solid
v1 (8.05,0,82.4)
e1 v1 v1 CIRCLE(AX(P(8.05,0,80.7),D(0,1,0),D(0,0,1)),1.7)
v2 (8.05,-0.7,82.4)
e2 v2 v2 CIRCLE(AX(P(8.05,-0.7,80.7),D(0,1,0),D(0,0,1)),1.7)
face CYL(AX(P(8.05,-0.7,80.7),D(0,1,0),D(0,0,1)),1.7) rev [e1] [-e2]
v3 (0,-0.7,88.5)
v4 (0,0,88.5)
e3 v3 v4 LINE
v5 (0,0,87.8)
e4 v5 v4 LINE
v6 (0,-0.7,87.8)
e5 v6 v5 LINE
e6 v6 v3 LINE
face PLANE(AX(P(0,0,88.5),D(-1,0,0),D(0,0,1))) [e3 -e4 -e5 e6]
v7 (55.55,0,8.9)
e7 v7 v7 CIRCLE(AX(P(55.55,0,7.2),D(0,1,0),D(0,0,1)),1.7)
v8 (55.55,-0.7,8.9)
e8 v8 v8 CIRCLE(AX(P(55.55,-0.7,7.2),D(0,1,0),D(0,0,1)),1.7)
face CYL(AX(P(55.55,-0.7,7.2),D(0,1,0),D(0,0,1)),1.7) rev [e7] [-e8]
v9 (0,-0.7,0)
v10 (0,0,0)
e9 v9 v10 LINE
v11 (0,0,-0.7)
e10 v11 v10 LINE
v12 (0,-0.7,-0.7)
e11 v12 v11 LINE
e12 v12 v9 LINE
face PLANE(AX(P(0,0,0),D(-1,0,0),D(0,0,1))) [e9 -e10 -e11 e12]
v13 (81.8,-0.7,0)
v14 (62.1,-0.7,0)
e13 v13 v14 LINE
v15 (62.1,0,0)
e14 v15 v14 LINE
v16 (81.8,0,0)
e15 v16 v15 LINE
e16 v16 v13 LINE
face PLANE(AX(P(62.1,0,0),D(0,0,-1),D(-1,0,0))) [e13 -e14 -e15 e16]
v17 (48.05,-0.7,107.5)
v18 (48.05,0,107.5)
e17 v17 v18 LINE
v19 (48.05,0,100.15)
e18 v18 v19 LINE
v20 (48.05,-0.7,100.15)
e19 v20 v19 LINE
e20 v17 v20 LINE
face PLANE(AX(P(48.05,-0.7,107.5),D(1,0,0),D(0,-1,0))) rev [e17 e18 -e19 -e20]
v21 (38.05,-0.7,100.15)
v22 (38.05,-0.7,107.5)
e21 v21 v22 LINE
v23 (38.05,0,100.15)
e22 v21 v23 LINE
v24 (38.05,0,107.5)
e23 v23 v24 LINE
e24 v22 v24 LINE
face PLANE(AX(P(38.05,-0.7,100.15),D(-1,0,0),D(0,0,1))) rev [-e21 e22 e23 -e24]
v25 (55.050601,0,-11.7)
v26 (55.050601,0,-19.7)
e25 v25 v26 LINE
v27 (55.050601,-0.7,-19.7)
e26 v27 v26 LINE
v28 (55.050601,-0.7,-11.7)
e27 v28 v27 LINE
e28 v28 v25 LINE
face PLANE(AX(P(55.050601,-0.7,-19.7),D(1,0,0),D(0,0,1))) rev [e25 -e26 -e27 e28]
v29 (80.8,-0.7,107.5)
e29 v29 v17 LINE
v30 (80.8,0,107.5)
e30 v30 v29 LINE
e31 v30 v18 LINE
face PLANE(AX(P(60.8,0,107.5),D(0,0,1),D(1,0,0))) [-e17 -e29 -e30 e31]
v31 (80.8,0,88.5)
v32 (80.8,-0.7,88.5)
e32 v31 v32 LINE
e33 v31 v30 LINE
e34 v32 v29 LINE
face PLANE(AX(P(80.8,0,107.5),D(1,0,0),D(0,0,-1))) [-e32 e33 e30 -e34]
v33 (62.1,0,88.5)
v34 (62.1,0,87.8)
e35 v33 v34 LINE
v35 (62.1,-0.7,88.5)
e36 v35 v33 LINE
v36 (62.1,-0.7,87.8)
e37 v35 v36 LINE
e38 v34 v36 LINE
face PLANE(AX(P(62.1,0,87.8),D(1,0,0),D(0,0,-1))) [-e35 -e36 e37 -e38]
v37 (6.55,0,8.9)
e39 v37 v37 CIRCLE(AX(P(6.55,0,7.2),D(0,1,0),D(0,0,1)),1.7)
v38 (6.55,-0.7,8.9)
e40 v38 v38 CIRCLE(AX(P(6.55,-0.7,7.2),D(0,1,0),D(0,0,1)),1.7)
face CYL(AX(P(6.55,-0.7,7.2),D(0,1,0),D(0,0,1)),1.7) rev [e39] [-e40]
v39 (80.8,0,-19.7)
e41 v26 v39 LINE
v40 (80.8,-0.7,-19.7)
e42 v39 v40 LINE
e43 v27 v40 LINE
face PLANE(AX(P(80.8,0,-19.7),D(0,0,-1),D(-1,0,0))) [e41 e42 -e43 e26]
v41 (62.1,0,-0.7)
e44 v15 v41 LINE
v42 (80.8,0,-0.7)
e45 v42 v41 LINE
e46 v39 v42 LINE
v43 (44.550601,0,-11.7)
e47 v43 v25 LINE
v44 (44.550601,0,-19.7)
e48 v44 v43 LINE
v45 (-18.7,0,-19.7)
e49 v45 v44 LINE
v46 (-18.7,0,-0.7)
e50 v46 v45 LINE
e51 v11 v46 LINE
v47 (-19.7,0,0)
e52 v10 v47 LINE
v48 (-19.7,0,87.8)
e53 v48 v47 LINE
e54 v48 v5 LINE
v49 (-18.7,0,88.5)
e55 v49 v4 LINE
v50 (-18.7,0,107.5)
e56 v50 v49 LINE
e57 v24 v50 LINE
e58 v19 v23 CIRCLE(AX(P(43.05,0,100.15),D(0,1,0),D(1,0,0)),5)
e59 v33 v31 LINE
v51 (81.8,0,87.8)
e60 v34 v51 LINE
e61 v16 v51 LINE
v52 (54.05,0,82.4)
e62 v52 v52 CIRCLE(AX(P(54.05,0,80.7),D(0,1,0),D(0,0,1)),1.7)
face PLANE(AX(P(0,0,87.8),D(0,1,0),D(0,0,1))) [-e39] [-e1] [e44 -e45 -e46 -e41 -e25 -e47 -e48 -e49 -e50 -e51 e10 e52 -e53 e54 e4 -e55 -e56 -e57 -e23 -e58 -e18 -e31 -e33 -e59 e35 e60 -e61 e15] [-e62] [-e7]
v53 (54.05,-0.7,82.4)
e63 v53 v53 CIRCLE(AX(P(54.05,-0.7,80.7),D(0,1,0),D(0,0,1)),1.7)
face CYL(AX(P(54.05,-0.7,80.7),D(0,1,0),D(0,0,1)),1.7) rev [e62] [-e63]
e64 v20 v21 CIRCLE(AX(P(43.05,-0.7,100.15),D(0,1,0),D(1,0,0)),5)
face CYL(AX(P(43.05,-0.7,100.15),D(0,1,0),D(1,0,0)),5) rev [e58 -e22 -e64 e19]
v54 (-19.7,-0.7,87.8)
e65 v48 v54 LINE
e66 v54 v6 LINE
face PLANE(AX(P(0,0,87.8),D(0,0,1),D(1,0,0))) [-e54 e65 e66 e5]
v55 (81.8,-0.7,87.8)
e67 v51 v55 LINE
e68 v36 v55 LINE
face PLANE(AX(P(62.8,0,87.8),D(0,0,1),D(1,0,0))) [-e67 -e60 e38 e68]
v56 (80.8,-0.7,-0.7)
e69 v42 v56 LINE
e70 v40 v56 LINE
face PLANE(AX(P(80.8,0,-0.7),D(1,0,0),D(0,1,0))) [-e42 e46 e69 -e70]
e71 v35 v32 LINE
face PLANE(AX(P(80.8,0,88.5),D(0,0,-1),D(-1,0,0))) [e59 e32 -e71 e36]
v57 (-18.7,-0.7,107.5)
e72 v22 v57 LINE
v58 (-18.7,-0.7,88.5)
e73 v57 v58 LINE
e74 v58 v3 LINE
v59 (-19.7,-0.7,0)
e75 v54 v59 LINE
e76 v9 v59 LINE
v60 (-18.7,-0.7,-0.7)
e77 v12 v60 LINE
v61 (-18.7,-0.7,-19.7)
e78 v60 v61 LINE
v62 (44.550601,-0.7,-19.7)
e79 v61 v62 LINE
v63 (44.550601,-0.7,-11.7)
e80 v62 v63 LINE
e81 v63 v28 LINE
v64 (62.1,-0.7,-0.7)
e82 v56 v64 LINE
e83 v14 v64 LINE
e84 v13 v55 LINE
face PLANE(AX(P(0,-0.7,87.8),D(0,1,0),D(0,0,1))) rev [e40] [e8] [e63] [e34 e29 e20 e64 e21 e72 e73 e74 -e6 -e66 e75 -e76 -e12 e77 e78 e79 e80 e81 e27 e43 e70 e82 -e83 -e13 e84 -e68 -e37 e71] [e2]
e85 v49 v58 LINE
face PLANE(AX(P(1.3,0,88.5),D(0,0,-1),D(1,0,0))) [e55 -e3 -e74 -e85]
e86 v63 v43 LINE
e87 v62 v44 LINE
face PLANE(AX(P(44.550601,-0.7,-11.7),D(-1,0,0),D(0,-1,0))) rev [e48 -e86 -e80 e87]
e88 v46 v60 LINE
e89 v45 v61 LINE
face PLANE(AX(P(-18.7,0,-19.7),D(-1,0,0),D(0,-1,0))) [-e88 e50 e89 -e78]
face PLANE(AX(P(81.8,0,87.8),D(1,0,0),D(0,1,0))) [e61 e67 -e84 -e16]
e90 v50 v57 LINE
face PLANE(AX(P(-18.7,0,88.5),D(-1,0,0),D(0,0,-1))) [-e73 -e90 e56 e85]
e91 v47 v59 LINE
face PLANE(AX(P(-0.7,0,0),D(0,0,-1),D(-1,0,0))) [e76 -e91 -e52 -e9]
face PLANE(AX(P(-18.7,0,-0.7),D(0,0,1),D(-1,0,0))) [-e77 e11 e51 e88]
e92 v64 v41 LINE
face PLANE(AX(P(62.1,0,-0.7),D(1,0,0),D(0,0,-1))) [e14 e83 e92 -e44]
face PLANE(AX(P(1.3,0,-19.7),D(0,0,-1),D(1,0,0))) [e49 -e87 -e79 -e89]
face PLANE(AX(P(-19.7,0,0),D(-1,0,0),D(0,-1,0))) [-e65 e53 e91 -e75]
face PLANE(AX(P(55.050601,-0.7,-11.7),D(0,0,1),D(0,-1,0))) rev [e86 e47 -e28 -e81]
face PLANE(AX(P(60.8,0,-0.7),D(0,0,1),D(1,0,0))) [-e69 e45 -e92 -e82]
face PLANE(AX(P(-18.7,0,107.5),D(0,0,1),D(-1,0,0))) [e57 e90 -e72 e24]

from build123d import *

# Parameters (mm, degrees)
SKETCH1_W                 = 62.1
SKETCH1_H                 = 0.7
BASE_FLANGE1_DEPTH        = 87.8
EDGE_FLANGE1_DEPTH        = 87.8
EDGE_FLANGE2_DEPTH        = 87.8
EDGE_FLANGE3_DEPTH        = 62.1
CUT_EXTRUDE2_DEPTH        = 0.7
SKETCH14_R                = 1.7
CUT_EXTRUDE3_DEPTH        = 0.7
EDGE_FLANGE4_DEPTH        = 19
EDGE_FLANGE5_DEPTH        = 19
EDGE_FLANGE6_DEPTH        = 62.1
EDGE_FLANGE7_DEPTH        = 19
EDGE_FLANGE8_DEPTH        = 19
SKETCH32_W                = 10.5
SKETCH32_H                = 8
CUT_EXTRUDE5_DEPTH        = 0.7
FLAT_PATTERN1_START       = -20.7
FLAT_PATTERN1_OUTLINE_R   = 1.7
FLAT_PATTERN1_DEPTH       = 20
FLAT_PATTERN1_START_2     = -0.7
FLAT_PATTERN1_2_OUTLINE_R = 1.7
FLAT_PATTERN1_2_DEPTH     = 0.7


with BuildPart() as part:
    # Base-Flange1: sheet metal written as solids
    # Sketch1 → Base-Flange1 (new body)
    with BuildSketch(Plane.XY):
        with Locations((31.05, -0.35)):
            Rectangle(SKETCH1_W, SKETCH1_H)
    extrude(amount=BASE_FLANGE1_DEPTH)

    # Edge-Flange1: sheet metal written as solids
    # Edge-Flange1 section (on a plane across the edge) → Edge-Flange1 (add)
    with BuildSketch(Plane(origin=(63.1, -0.7, 0), x_dir=(-1, 0, 0), z_dir=(0, 0, 1))):
        with BuildLine():
            Line((-0.7, 1), (-0.7, 20))
            Line((-0.7, 20), (0, 20))
            Line((0, 20), (0, 1))
            ThreePointArc((0, 1), (0.292893219, 0.292893219), (1, 0))
            Line((1, 0), (1, -0.7))
            ThreePointArc((1, -0.7), (-0.202081528, -0.202081528), (-0.7, 1))
        make_face()
    extrude(amount=EDGE_FLANGE1_DEPTH)

    # Edge-Flange2: sheet metal written as solids
    # Edge-Flange2 section (on a plane across the edge) → Edge-Flange2 (add)
    with BuildSketch(Plane(origin=(-1, -0.7, 87.8), x_dir=(1, 0, 0), z_dir=(0, 0, -1))):
        with BuildLine():
            Line((-0.7, 1), (-0.7, 20))
            Line((-0.7, 20), (0, 20))
            Line((0, 20), (0, 1))
            ThreePointArc((0, 1), (0.292893219, 0.292893219), (1, 0))
            Line((1, 0), (1, -0.7))
            ThreePointArc((1, -0.7), (-0.202081528, -0.202081528), (-0.7, 1))
        make_face()
    extrude(amount=EDGE_FLANGE2_DEPTH)

    # Edge-Flange3: sheet metal written as solids
    # Edge-Flange3 section (on a plane across the edge) → Edge-Flange3 (add)
    with BuildSketch(Plane(origin=(62.1, -0.7, 88.8), x_dir=(0, 0, -1), z_dir=(-1, 0, 0))):
        with BuildLine():
            Line((-0.7, 1), (-0.7, 20))
            Line((-0.7, 20), (0, 20))
            Line((0, 20), (0, 1))
            ThreePointArc((0, 1), (0.292893219, 0.292893219), (1, 0))
            Line((1, 0), (1, -0.7))
            ThreePointArc((1, -0.7), (-0.202081528, -0.202081528), (-0.7, 1))
        make_face()
    extrude(amount=EDGE_FLANGE3_DEPTH)

    # Sketch13 → Cut-Extrude2 (cut)
    with BuildSketch(Plane.XY.offset(89.5)):
        with BuildLine():
            Line((38.05, -13.35), (38.05, -20.7))
            Line((38.05, -20.7), (48.05, -20.7))
            Line((48.05, -20.7), (48.05, -13.35))
            ThreePointArc((48.05, -13.35), (43.05, -8.35), (38.05, -13.35))
        make_face()
    extrude(amount=-CUT_EXTRUDE2_DEPTH, mode=Mode.SUBTRACT)

    # Sketch14 → Cut-Extrude3 (cut)
    with BuildSketch(Plane(origin=(0, 0, 0), x_dir=(1, 0, 0), z_dir=(0, 1, 0))):
        with Locations(Location((6.55, -7.2, 0), (0, 0, 270))):
            Circle(SKETCH14_R)
        with Locations(Location((55.55, -7.2, 0), (0, 0, 270))):
            Circle(SKETCH14_R)
        with Locations(Location((8.05, -80.7, 0), (0, 0, 270))):
            Circle(SKETCH14_R)
        with Locations(Location((54.05, -80.7, 0), (0, 0, 270))):
            Circle(SKETCH14_R)
    extrude(amount=-CUT_EXTRUDE3_DEPTH, mode=Mode.SUBTRACT)

    # Edge-Flange4: sheet metal written as solids
    # Edge-Flange4 section (on a plane across the edge) → Edge-Flange4 (add)
    with BuildSketch(Plane(origin=(64.1, -1.7, 88.8), x_dir=(-1, 0, 0), z_dir=(0, -1, 0))):
        with BuildLine():
            Line((-0.7, 2), (-0.7, 20))
            Line((-0.7, 20), (0, 20))
            Line((0, 20), (0, 2))
            ThreePointArc((0, 2), (0.585786438, 0.585786438), (2, 0))
            Line((2, 0), (2, -0.7))
            ThreePointArc((2, -0.7), (0.090811691, 0.090811691), (-0.7, 2))
        make_face()
    extrude(amount=EDGE_FLANGE4_DEPTH)

    # Edge-Flange5: sheet metal written as solids
    # Edge-Flange5 section (on a plane across the edge) → Edge-Flange5 (add)
    with BuildSketch(Plane(origin=(-2, -20.7, 88.8), x_dir=(1, 0, 0), z_dir=(0, 1, 0))):
        with BuildLine():
            Line((-0.7, 2), (-0.7, 20))
            Line((-0.7, 20), (0, 20))
            Line((0, 20), (0, 2))
            ThreePointArc((0, 2), (0.585786438, 0.585786438), (2, 0))
            Line((2, 0), (2, -0.7))
            ThreePointArc((2, -0.7), (0.090811691, 0.090811691), (-0.7, 2))
        make_face()
    extrude(amount=EDGE_FLANGE5_DEPTH)

    # Edge-Flange6: sheet metal written as solids
    # Edge-Flange6 section (on a plane across the edge) → Edge-Flange6 (add)
    with BuildSketch(Plane(origin=(0, -0.7, -1), x_dir=(0, 0, 1), z_dir=(1, 0, 0))):
        with BuildLine():
            Line((-0.7, 1), (-0.7, 20))
            Line((-0.7, 20), (0, 20))
            Line((0, 20), (0, 1))
            ThreePointArc((0, 1), (0.292893219, 0.292893219), (1, 0))
            Line((1, 0), (1, -0.7))
            ThreePointArc((1, -0.7), (-0.202081528, -0.202081528), (-0.7, 1))
        make_face()
    extrude(amount=EDGE_FLANGE6_DEPTH)

    # Edge-Flange7: sheet metal written as solids
    # Edge-Flange7 section (on a plane across the edge) → Edge-Flange7 (add)
    with BuildSketch(Plane(origin=(64.1, -20.7, -1), x_dir=(-1, 0, 0), z_dir=(0, 1, 0))):
        with BuildLine():
            Line((-0.7, 2), (-0.7, 20))
            Line((-0.7, 20), (0, 20))
            Line((0, 20), (0, 2))
            ThreePointArc((0, 2), (0.585786438, 0.585786438), (2, 0))
            Line((2, 0), (2, -0.7))
            ThreePointArc((2, -0.7), (0.090811691, 0.090811691), (-0.7, 2))
        make_face()
    extrude(amount=EDGE_FLANGE7_DEPTH)

    # Edge-Flange8: sheet metal written as solids
    # Edge-Flange8 section (on a plane across the edge) → Edge-Flange8 (add)
    with BuildSketch(Plane(origin=(-2, -1.7, -1), x_dir=(1, 0, 0), z_dir=(0, -1, 0))):
        with BuildLine():
            Line((-0.7, 2), (-0.7, 20))
            Line((-0.7, 20), (0, 20))
            Line((0, 20), (0, 2))
            ThreePointArc((0, 2), (0.585786438, 0.585786438), (2, 0))
            Line((2, 0), (2, -0.7))
            ThreePointArc((2, -0.7), (0.090811691, 0.090811691), (-0.7, 2))
        make_face()
    extrude(amount=EDGE_FLANGE8_DEPTH)

    # Sketch32 → Cut-Extrude5 (cut)
    with BuildSketch(Plane(origin=(0, 0, -1.7), x_dir=(-1, 0, 0), z_dir=(0, 0, -1))):
        with Locations((-49.8006007, -16.7)):
            Rectangle(SKETCH32_W, SKETCH32_H)
    extrude(amount=-CUT_EXTRUDE5_DEPTH, mode=Mode.SUBTRACT)

    # Flat-Pattern1: read off the stored shape, not the designer's step
    # Flat-Pattern1 outline → Flat-Pattern1 (cut)
    with BuildSketch(Plane(origin=(0, 0, 0), x_dir=(1, 0, 0), z_dir=(0, 1, 0)).offset(FLAT_PATTERN1_START)):
        with BuildLine():
            Line((-1.7, 0), (-1.7, -87.8))
            Line((-1.7, -87.8), (0, -87.8))
            Line((0, -87.8), (0, -88.5))
            Line((0, -88.5), (-1.053565375, -88.5))
            ThreePointArc((-1.053565375, -88.5), (-1.747445385, -87.772848716), (-2, -86.8))
            Line((-2, -86.8), (-2, -68.8))
            Line((-2, -68.8), (-2.7, -68.8))
            Line((-2.7, -68.8), (-2.7, -86.8))
            ThreePointArc((-2.7, -86.8), (-2.54495263, -87.701784958), (-2.097617696, -88.5))
            Line((-2.097617696, -88.5), (-18.7, -88.5))
            Line((-18.7, -88.5), (-18.7, -107.5))
            Line((-18.7, -107.5), (38.05, -107.5))
            Line((38.05, -107.5), (38.05, -100.15))
            ThreePointArc((38.05, -100.15), (43.05, -95.15), (48.05, -100.15))
            Line((48.05, -100.15), (48.05, -107.5))
            Line((48.05, -107.5), (80.8, -107.5))
            Line((80.8, -107.5), (80.8, -88.5))
            Line((80.8, -88.5), (64.197617696, -88.5))
            ThreePointArc((64.197617696, -88.5), (64.64495263, -87.701784958), (64.8, -86.8))
            Line((64.8, -86.8), (64.8, -68.8))
            Line((64.8, -68.8), (64.1, -68.8))
            Line((64.1, -68.8), (64.1, -86.8))
            ThreePointArc((64.1, -86.8), (63.847445385, -87.772848716), (63.153565375, -88.5))
            Line((63.153565375, -88.5), (62.1, -88.5))
            Line((62.1, -88.5), (62.1, -87.8))
            Line((62.1, -87.8), (63.8, -87.8))
            Line((63.8, -87.8), (63.8, 0))
            Line((63.8, 0), (62.1, 0))
            Line((62.1, 0), (62.1, 0.7))
            Line((62.1, 0.7), (63.153565375, 0.7))
            ThreePointArc((63.153565375, 0.7), (63.847445385, -0.027151284), (64.1, -1))
            Line((64.1, -1), (64.1, -19))
            Line((64.1, -19), (64.8, -19))
            Line((64.8, -19), (64.8, -1))
            ThreePointArc((64.8, -1), (64.009188309, 0.909188309), (62.1, 1.7))
            Line((62.1, 1.7), (0, 1.7))
            ThreePointArc((0, 1.7), (-1.909188309, 0.909188309), (-2.7, -1))
            Line((-2.7, -1), (-2.7, -19))
            Line((-2.7, -19), (-2, -19))
            Line((-2, -19), (-2, -1))
            ThreePointArc((-2, -1), (-1.747445385, -0.027151284), (-1.053565375, 0.7))
            Line((-1.053565375, 0.7), (0, 0.7))
            Line((0, 0.7), (0, 0))
            Line((0, 0), (-1.7, 0))
        make_face()
        with Locations((55.55, -7.2)):
            Circle(FLAT_PATTERN1_OUTLINE_R, mode=Mode.SUBTRACT)
        with Locations((8.05, -80.7)):
            Circle(FLAT_PATTERN1_OUTLINE_R, mode=Mode.SUBTRACT)
        with Locations((54.05, -80.7)):
            Circle(FLAT_PATTERN1_OUTLINE_R, mode=Mode.SUBTRACT)
        with Locations((6.55, -7.2)):
            Circle(FLAT_PATTERN1_OUTLINE_R, mode=Mode.SUBTRACT)
    extrude(amount=FLAT_PATTERN1_DEPTH, mode=Mode.SUBTRACT)

    # Flat-Pattern1 2 outline → Flat-Pattern1 2 (add)
    with BuildSketch(Plane(origin=(0, 0, 0), x_dir=(1, 0, 0), z_dir=(0, 1, 0)).offset(FLAT_PATTERN1_START_2)):
        with BuildLine():
            Line((0, -87.8), (0, -88.5))
            Line((0, -88.5), (-18.7, -88.5))
            Line((-18.7, -88.5), (-18.7, -107.5))
            Line((-18.7, -107.5), (38.05, -107.5))
            Line((38.05, -107.5), (38.05, -100.15))
            ThreePointArc((38.05, -100.15), (43.05, -95.15), (48.05, -100.15))
            Line((48.05, -100.15), (48.05, -107.5))
            Line((48.05, -107.5), (80.8, -107.5))
            Line((80.8, -107.5), (80.8, -88.5))
            Line((80.8, -88.5), (62.1, -88.5))
            Line((62.1, -88.5), (62.1, -87.8))
            Line((62.1, -87.8), (81.8, -87.8))
            Line((81.8, -87.8), (81.8, 0))
            Line((81.8, 0), (62.1, 0))
            Line((62.1, 0), (62.1, 0.7))
            Line((62.1, 0.7), (80.8, 0.7))
            Line((80.8, 0.7), (80.8, 19.7))
            Line((80.8, 19.7), (55.0506007, 19.7))
            Line((55.0506007, 19.7), (55.0506007, 11.7))
            Line((55.0506007, 11.7), (44.5506007, 11.7))
            Line((44.5506007, 11.7), (44.5506007, 19.7))
            Line((44.5506007, 19.7), (-18.7, 19.7))
            Line((-18.7, 19.7), (-18.7, 0.7))
            Line((-18.7, 0.7), (0, 0.7))
            Line((0, 0.7), (0, 0))
            Line((0, 0), (-19.7, 0))
            Line((-19.7, 0), (-19.7, -87.8))
            Line((-19.7, -87.8), (0, -87.8))
        make_face()
        with Locations((55.55, -7.2)):
            Circle(FLAT_PATTERN1_2_OUTLINE_R, mode=Mode.SUBTRACT)
        with Locations((8.05, -80.7)):
            Circle(FLAT_PATTERN1_2_OUTLINE_R, mode=Mode.SUBTRACT)
        with Locations((54.05, -80.7)):
            Circle(FLAT_PATTERN1_2_OUTLINE_R, mode=Mode.SUBTRACT)
        with Locations((6.55, -7.2)):
            Circle(FLAT_PATTERN1_2_OUTLINE_R, mode=Mode.SUBTRACT)
    extrude(amount=FLAT_PATTERN1_2_DEPTH)


solid = part.part
